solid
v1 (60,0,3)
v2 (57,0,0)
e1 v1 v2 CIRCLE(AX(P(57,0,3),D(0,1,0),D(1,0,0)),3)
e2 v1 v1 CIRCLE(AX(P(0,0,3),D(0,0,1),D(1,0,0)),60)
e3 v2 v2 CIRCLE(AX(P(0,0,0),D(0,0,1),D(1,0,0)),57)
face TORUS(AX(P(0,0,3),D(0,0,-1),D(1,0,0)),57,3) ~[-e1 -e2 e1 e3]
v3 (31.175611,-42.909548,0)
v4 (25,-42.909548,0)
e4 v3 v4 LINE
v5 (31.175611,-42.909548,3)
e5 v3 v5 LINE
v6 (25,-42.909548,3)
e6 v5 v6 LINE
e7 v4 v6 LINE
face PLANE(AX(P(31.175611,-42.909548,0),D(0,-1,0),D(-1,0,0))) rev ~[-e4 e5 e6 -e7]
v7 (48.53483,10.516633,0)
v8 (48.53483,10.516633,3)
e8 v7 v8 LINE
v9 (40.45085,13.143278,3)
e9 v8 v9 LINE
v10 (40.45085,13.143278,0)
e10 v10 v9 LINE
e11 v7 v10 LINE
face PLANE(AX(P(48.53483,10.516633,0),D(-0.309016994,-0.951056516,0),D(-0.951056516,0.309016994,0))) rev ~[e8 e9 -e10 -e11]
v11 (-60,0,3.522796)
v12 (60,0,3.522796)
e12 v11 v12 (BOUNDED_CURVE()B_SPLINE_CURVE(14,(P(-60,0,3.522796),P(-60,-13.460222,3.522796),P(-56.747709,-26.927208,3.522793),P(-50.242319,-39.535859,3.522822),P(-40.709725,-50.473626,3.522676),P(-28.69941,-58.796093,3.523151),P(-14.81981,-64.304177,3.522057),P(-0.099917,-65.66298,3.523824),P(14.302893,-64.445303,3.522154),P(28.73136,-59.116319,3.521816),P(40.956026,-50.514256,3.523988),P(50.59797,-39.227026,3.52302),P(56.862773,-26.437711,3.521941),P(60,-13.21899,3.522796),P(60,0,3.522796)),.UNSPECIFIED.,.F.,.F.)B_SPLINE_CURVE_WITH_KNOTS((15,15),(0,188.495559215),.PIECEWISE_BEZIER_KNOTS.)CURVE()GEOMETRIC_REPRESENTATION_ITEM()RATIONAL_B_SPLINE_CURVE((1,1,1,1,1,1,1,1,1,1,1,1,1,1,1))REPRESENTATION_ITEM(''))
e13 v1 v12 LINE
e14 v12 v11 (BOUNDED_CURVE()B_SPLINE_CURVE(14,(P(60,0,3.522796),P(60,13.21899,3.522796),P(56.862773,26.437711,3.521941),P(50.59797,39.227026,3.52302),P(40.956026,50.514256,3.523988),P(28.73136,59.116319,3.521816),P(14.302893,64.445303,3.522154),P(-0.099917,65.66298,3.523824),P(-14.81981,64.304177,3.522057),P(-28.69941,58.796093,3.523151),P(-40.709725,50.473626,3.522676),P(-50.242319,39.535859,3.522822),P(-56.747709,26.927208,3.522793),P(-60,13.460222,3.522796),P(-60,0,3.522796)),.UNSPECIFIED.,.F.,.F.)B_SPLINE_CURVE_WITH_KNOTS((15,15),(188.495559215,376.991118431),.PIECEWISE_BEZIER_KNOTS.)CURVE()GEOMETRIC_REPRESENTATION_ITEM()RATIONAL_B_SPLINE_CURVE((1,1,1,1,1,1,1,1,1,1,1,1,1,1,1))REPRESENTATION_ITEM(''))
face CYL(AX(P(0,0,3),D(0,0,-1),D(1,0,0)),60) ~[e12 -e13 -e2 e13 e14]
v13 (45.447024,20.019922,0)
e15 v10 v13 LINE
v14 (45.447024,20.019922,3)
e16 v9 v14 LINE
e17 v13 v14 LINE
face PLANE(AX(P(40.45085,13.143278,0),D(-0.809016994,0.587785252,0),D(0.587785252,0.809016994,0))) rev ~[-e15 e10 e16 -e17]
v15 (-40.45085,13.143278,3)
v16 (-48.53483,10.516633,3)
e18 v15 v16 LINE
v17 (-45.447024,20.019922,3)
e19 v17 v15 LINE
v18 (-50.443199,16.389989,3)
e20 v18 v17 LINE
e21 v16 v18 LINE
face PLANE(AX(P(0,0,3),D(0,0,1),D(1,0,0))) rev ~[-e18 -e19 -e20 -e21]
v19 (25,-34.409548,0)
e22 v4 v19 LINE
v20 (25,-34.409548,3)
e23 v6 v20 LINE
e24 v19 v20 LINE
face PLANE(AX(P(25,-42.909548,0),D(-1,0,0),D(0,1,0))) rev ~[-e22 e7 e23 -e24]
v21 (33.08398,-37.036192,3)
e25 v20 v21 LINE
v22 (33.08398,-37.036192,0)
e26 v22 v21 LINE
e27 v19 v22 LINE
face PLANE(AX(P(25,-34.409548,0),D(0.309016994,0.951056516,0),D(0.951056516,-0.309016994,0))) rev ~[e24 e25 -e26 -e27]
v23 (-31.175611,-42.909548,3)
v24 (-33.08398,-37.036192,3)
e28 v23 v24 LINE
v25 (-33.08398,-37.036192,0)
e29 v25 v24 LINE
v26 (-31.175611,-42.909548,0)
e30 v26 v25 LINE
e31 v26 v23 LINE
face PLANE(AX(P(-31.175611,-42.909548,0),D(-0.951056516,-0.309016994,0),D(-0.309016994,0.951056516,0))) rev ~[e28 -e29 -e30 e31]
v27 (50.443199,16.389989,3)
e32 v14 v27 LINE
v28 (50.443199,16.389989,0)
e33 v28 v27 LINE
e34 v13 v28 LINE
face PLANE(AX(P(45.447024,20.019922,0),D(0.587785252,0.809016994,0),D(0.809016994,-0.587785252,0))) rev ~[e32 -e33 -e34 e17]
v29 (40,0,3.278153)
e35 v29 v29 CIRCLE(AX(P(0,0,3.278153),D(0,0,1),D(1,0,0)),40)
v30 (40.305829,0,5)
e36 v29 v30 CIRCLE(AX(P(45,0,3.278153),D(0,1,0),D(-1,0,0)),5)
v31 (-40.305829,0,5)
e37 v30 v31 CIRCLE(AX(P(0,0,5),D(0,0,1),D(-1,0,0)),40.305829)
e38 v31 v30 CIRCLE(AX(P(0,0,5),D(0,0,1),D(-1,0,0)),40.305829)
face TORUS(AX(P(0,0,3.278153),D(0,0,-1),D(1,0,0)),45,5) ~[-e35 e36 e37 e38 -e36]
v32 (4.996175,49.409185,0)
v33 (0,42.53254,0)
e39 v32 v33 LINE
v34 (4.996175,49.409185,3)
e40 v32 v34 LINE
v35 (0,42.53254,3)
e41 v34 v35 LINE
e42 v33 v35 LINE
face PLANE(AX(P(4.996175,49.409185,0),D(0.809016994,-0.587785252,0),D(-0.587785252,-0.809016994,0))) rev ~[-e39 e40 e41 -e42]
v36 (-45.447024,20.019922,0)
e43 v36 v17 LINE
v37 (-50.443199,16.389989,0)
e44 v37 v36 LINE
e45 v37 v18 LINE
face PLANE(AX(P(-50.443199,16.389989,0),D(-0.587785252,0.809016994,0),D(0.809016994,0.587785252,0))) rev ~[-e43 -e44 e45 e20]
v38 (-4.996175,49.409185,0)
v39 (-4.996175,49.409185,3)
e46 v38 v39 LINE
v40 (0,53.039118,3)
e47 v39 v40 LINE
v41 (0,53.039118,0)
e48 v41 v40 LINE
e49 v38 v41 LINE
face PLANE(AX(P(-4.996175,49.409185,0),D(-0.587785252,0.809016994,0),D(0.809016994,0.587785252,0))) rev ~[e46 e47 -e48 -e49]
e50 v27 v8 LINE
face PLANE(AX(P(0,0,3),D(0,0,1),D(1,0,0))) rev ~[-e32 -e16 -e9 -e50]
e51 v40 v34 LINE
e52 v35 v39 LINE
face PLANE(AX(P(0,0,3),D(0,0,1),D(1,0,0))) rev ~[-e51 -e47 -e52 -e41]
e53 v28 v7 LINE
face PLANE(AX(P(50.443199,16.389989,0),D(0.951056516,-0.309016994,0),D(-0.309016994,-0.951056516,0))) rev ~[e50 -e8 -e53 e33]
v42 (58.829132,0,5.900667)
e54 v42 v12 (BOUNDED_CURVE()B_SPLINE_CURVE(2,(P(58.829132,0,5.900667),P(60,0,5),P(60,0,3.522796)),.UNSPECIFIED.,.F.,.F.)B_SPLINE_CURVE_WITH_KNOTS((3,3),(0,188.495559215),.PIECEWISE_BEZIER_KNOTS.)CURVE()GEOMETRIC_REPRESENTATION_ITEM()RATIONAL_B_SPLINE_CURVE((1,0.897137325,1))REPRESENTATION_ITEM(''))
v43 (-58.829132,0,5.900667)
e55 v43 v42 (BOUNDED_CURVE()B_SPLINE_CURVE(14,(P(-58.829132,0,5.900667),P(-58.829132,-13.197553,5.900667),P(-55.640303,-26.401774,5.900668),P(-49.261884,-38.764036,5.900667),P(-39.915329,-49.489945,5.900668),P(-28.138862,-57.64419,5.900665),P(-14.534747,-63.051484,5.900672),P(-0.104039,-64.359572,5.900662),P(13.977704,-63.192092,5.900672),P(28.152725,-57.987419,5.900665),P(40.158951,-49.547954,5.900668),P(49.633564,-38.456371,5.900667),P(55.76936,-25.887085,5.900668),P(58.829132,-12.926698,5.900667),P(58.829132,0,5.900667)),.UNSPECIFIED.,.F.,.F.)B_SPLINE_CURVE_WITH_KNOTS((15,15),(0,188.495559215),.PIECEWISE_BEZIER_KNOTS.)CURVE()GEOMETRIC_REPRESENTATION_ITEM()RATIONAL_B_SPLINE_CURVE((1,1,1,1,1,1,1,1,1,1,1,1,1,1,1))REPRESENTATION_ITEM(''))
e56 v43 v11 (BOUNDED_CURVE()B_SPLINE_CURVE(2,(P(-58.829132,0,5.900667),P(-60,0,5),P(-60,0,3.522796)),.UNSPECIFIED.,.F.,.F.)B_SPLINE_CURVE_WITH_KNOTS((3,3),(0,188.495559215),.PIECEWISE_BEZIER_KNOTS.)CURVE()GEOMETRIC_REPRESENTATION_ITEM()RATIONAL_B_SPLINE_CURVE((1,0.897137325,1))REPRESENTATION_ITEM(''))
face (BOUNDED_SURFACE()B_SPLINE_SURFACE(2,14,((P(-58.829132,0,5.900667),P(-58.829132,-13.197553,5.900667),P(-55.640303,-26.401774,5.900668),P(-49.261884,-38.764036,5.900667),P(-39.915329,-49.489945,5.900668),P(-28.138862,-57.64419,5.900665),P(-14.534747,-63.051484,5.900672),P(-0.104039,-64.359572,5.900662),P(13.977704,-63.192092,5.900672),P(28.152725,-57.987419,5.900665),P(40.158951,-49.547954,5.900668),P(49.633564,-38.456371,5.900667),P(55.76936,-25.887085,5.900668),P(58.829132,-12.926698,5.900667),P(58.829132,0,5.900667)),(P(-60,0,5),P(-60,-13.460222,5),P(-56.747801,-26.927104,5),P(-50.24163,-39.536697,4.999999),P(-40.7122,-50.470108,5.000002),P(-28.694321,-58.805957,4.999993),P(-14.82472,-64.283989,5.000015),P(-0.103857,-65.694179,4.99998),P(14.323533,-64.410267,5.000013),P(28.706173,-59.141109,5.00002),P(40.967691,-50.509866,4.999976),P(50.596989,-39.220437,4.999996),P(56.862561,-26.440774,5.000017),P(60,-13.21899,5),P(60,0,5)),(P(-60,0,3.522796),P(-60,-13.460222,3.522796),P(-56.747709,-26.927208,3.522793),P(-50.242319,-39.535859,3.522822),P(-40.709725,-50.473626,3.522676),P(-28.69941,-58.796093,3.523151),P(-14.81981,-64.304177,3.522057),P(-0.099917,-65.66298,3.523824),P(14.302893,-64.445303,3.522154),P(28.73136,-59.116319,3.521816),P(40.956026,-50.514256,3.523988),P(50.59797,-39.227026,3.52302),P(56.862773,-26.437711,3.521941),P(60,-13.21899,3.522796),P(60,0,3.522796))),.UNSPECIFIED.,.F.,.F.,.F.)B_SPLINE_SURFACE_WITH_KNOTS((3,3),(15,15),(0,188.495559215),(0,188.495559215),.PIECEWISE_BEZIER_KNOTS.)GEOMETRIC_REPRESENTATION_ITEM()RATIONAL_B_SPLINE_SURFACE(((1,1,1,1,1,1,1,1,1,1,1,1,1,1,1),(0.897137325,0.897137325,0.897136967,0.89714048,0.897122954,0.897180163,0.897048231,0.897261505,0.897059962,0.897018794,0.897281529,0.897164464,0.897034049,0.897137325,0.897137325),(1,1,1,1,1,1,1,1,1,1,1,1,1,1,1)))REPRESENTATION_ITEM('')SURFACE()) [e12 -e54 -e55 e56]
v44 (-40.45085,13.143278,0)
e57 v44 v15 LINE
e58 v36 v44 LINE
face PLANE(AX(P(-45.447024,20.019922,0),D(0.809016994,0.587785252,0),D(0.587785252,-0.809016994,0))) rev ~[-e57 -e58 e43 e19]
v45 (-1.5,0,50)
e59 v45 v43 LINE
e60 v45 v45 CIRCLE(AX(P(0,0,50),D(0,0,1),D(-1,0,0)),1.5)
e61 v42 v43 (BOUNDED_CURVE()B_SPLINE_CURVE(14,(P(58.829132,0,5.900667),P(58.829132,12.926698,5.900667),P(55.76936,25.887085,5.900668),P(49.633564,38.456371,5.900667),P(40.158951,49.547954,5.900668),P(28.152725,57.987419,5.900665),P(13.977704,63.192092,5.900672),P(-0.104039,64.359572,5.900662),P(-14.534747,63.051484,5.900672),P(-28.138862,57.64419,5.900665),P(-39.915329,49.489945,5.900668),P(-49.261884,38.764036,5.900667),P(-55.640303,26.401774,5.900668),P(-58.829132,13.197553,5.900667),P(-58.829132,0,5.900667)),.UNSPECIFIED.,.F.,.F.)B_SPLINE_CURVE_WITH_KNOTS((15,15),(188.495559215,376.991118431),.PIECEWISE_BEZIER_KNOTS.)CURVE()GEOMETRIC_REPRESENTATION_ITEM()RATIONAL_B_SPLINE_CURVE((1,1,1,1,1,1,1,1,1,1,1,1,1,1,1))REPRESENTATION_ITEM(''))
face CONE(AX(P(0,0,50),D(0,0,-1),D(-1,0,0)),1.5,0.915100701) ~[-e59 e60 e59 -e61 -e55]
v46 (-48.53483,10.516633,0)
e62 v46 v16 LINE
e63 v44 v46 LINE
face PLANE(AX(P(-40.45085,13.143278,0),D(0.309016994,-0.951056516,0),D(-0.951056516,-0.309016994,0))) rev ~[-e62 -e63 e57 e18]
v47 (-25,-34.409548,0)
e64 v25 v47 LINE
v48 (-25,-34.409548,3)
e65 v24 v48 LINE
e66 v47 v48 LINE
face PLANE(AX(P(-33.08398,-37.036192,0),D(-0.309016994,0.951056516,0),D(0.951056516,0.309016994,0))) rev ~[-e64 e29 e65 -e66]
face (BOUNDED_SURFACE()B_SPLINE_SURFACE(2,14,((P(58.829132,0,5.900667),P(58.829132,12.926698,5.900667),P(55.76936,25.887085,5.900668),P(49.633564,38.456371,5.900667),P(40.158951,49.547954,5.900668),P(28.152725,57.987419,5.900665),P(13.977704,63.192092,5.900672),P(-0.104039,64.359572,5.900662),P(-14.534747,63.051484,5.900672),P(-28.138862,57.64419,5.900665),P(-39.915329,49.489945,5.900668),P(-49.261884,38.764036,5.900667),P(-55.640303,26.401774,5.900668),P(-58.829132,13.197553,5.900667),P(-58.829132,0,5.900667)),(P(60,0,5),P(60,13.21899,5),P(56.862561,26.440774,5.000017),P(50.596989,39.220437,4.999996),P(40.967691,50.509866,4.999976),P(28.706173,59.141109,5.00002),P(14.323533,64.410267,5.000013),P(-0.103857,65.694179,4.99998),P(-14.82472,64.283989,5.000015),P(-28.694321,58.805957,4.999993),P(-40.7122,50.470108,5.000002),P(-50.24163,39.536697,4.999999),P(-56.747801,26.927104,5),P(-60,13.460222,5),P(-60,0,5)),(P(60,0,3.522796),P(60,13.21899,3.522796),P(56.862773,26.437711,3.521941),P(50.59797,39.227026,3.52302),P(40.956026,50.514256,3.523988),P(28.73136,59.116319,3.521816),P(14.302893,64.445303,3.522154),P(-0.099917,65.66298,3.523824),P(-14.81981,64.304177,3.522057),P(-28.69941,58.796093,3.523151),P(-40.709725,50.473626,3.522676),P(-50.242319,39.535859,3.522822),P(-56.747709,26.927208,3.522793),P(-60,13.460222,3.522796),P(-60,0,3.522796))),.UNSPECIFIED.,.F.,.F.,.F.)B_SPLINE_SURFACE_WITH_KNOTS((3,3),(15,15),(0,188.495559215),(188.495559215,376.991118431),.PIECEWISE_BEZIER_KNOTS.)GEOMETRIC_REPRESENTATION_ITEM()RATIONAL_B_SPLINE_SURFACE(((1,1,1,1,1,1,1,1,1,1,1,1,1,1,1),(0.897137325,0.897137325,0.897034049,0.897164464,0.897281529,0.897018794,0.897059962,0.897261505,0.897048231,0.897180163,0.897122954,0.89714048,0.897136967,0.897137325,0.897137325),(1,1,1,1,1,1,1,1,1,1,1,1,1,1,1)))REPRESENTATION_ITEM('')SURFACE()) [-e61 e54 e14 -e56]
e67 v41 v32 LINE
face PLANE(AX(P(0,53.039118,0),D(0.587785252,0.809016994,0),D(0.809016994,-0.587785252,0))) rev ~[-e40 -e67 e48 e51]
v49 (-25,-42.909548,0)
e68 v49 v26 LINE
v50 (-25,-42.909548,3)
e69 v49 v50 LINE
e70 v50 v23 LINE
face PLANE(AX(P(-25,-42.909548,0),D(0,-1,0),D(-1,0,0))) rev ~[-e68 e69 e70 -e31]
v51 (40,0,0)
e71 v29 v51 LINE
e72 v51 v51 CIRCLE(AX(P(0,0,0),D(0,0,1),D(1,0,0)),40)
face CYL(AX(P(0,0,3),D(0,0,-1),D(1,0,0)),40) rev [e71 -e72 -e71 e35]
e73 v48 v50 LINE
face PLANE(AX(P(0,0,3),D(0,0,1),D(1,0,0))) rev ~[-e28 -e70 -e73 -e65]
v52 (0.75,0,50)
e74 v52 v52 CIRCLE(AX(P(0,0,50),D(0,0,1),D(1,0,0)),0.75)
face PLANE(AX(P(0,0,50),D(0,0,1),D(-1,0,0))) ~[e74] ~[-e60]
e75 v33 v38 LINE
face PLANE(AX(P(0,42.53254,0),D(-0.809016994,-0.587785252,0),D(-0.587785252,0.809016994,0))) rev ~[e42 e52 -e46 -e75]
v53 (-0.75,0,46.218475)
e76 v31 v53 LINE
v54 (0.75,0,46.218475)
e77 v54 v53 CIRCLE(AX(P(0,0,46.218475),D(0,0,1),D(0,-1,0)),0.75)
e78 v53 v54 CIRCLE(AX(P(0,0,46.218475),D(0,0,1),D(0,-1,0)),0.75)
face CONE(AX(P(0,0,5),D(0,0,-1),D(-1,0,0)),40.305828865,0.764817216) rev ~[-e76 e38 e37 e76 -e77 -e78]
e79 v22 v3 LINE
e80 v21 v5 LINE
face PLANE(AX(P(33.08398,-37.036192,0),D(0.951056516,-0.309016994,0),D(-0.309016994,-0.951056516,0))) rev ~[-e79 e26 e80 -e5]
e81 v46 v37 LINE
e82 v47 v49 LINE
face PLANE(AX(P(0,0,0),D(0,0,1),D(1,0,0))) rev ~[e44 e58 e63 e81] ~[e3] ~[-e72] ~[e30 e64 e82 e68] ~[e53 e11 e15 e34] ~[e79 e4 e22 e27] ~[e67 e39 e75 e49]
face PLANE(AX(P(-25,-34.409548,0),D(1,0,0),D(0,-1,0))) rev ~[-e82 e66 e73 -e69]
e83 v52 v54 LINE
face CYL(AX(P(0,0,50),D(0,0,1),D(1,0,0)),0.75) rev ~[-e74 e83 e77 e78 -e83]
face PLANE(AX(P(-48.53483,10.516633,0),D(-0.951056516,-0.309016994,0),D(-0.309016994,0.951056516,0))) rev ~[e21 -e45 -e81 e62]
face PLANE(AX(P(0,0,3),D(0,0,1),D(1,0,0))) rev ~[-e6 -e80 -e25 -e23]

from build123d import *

# Parameters (mm, degrees)
F0_R      = 60
F0_R_2    = 40
F3_DEPTH  = 3
F4_R      = 60
F4_R_2    = 40
F5_DEPTH  = 2
F9_R      = 3
F10_R     = 0.75
F11_DEPTH = 50.001


# Not quite as in the source:
# - a fillet or chamfer that OpenCascade refuses, or shapes differently, is made with other operations: its cross-section is extruded or revolved along the edge and cut away or added


with BuildPart() as f3:
    # F0 (on Top) → F3 (new body)
    with BuildSketch(Plane.XY):
        Circle(F0_R)
        Polygon((-25, -34.4095480118), (-25, -42.9095480118), (-31.175611488, -42.9095480118), (-33.0839803885, -37.036192464), align=None, mode=Mode.SUBTRACT)
        Polygon((25, -34.4095480118), (33.0839803885, -37.036192464), (31.175611488, -42.9095480118), (25, -42.9095480118), align=None, mode=Mode.SUBTRACT)
        Polygon((-45.4470243632, 20.0199222552), (-40.4508497187, 13.143277803), (-48.5348301073, 10.5166333508), (-50.4431990077, 16.3899888986), align=None, mode=Mode.SUBTRACT)
        Circle(F0_R_2, mode=Mode.SUBTRACT)
        Polygon((50.4431990077, 16.3899888986), (48.5348301073, 10.5166333508), (40.4508497187, 13.143277803), (45.4470243632, 20.0199222552), align=None, mode=Mode.SUBTRACT)
        Polygon((4.9961746445, 49.4091848698), (0, 42.5325404176), (-4.9961746445, 49.4091848698), (0, 53.0391182264), align=None, mode=Mode.SUBTRACT)
    extrude(amount=F3_DEPTH)

    # F4 (on face) → F5 (join)
    with BuildSketch(Plane.XY.offset(3)):
        Circle(F4_R)
        Polygon((-31.175611488, -42.9095480118), (-33.0839803885, -37.036192464), (-25, -34.4095480118), (-25, -42.9095480118), align=None, mode=Mode.SUBTRACT)
        Polygon((25, -42.9095480118), (25, -34.4095480118), (33.0839803885, -37.036192464), (31.175611488, -42.9095480118), align=None, mode=Mode.SUBTRACT)
        Polygon((-40.4508497187, 13.143277803), (-48.5348301073, 10.5166333508), (-50.4431990077, 16.3899888986), (-45.4470243632, 20.0199222552), align=None, mode=Mode.SUBTRACT)
        Circle(F4_R_2, mode=Mode.SUBTRACT)
        Polygon((40.4508497187, 13.143277803), (45.4470243632, 20.0199222552), (50.4431990077, 16.3899888986), (48.5348301073, 10.5166333508), align=None, mode=Mode.SUBTRACT)
        Polygon((0, 53.0391182264), (4.9961746445, 49.4091848698), (0, 42.5325404176), (-4.9961746445, 49.4091848698), align=None, mode=Mode.SUBTRACT)
        Polygon((-50.4431990077, 16.3899888986), (-48.5348301073, 10.5166333508), (-40.4508497187, 13.143277803), (-45.4470243632, 20.0199222552), align=None)
        Polygon((0, 42.5325404176), (4.9961746445, 49.4091848698), (0, 53.0391182264), (-4.9961746445, 49.4091848698), align=None)
        Polygon((50.4431990077, 16.3899888986), (45.4470243632, 20.0199222552), (40.4508497187, 13.143277803), (48.5348301073, 10.5166333508), align=None)
        Polygon((33.0839803885, -37.036192464), (25, -34.4095480118), (25, -42.9095480118), (31.175611488, -42.9095480118), align=None)
        Polygon((-25, -34.4095480118), (-33.0839803885, -37.036192464), (-31.175611488, -42.9095480118), (-25, -42.9095480118), align=None)
    extrude(amount=F5_DEPTH)

    # F6 (on Front) → F8 (revolve)
    with BuildSketch(Plane.XZ):
        Polygon((-1.5, 50), (-60, 5), (-40.3058288648, 5), (0, 47), (0, 50), align=None)
    revolve(axis=Axis((0, 0, 19.0761145204), (0, 0, 1)))

    # F9
    f9_edges = [f3.edges().sort_by_distance(p)[0] for p in [
        (0, -60, 5),
        (0, 60, 5),
        (-60, 0, 0),
    ]]
    fillet(f9_edges, radius=F9_R)

    # F10 (on offset) → F11 (cut, through all)
    with BuildSketch(Plane.XY.offset(50)):
        Circle(F10_R)
    extrude(amount=-F11_DEPTH, mode=Mode.SUBTRACT)

    # F12: fillet of radius 5 on 1 edges, made by hand

    # F12_s1 → F12_t2 (revolve, cut)
    with BuildSketch(Plane.XZ):
        with BuildLine():
            ThreePointArc((40, 3.2781529238), (40.0770509003, 4.1525510952), (40.3058288648, 5))
            Line((40.3058288648, 5), (40.2119454421, 5.0344369415))
            ThreePointArc((40.2119454421, 5.0344369415), (40.1529144324, 5.1), (40, 5.1))
            Line((40, 5.1), (39.9, 5))
            Line((39.9, 5), (39.9, 3.2781529238))
            Line((39.9, 3.2781529238), (40, 3.2781529238))
        make_face()
    revolve(axis=Axis((0, 0, 5), (0, 0, 1)), mode=Mode.SUBTRACT)


solid = f3.part
